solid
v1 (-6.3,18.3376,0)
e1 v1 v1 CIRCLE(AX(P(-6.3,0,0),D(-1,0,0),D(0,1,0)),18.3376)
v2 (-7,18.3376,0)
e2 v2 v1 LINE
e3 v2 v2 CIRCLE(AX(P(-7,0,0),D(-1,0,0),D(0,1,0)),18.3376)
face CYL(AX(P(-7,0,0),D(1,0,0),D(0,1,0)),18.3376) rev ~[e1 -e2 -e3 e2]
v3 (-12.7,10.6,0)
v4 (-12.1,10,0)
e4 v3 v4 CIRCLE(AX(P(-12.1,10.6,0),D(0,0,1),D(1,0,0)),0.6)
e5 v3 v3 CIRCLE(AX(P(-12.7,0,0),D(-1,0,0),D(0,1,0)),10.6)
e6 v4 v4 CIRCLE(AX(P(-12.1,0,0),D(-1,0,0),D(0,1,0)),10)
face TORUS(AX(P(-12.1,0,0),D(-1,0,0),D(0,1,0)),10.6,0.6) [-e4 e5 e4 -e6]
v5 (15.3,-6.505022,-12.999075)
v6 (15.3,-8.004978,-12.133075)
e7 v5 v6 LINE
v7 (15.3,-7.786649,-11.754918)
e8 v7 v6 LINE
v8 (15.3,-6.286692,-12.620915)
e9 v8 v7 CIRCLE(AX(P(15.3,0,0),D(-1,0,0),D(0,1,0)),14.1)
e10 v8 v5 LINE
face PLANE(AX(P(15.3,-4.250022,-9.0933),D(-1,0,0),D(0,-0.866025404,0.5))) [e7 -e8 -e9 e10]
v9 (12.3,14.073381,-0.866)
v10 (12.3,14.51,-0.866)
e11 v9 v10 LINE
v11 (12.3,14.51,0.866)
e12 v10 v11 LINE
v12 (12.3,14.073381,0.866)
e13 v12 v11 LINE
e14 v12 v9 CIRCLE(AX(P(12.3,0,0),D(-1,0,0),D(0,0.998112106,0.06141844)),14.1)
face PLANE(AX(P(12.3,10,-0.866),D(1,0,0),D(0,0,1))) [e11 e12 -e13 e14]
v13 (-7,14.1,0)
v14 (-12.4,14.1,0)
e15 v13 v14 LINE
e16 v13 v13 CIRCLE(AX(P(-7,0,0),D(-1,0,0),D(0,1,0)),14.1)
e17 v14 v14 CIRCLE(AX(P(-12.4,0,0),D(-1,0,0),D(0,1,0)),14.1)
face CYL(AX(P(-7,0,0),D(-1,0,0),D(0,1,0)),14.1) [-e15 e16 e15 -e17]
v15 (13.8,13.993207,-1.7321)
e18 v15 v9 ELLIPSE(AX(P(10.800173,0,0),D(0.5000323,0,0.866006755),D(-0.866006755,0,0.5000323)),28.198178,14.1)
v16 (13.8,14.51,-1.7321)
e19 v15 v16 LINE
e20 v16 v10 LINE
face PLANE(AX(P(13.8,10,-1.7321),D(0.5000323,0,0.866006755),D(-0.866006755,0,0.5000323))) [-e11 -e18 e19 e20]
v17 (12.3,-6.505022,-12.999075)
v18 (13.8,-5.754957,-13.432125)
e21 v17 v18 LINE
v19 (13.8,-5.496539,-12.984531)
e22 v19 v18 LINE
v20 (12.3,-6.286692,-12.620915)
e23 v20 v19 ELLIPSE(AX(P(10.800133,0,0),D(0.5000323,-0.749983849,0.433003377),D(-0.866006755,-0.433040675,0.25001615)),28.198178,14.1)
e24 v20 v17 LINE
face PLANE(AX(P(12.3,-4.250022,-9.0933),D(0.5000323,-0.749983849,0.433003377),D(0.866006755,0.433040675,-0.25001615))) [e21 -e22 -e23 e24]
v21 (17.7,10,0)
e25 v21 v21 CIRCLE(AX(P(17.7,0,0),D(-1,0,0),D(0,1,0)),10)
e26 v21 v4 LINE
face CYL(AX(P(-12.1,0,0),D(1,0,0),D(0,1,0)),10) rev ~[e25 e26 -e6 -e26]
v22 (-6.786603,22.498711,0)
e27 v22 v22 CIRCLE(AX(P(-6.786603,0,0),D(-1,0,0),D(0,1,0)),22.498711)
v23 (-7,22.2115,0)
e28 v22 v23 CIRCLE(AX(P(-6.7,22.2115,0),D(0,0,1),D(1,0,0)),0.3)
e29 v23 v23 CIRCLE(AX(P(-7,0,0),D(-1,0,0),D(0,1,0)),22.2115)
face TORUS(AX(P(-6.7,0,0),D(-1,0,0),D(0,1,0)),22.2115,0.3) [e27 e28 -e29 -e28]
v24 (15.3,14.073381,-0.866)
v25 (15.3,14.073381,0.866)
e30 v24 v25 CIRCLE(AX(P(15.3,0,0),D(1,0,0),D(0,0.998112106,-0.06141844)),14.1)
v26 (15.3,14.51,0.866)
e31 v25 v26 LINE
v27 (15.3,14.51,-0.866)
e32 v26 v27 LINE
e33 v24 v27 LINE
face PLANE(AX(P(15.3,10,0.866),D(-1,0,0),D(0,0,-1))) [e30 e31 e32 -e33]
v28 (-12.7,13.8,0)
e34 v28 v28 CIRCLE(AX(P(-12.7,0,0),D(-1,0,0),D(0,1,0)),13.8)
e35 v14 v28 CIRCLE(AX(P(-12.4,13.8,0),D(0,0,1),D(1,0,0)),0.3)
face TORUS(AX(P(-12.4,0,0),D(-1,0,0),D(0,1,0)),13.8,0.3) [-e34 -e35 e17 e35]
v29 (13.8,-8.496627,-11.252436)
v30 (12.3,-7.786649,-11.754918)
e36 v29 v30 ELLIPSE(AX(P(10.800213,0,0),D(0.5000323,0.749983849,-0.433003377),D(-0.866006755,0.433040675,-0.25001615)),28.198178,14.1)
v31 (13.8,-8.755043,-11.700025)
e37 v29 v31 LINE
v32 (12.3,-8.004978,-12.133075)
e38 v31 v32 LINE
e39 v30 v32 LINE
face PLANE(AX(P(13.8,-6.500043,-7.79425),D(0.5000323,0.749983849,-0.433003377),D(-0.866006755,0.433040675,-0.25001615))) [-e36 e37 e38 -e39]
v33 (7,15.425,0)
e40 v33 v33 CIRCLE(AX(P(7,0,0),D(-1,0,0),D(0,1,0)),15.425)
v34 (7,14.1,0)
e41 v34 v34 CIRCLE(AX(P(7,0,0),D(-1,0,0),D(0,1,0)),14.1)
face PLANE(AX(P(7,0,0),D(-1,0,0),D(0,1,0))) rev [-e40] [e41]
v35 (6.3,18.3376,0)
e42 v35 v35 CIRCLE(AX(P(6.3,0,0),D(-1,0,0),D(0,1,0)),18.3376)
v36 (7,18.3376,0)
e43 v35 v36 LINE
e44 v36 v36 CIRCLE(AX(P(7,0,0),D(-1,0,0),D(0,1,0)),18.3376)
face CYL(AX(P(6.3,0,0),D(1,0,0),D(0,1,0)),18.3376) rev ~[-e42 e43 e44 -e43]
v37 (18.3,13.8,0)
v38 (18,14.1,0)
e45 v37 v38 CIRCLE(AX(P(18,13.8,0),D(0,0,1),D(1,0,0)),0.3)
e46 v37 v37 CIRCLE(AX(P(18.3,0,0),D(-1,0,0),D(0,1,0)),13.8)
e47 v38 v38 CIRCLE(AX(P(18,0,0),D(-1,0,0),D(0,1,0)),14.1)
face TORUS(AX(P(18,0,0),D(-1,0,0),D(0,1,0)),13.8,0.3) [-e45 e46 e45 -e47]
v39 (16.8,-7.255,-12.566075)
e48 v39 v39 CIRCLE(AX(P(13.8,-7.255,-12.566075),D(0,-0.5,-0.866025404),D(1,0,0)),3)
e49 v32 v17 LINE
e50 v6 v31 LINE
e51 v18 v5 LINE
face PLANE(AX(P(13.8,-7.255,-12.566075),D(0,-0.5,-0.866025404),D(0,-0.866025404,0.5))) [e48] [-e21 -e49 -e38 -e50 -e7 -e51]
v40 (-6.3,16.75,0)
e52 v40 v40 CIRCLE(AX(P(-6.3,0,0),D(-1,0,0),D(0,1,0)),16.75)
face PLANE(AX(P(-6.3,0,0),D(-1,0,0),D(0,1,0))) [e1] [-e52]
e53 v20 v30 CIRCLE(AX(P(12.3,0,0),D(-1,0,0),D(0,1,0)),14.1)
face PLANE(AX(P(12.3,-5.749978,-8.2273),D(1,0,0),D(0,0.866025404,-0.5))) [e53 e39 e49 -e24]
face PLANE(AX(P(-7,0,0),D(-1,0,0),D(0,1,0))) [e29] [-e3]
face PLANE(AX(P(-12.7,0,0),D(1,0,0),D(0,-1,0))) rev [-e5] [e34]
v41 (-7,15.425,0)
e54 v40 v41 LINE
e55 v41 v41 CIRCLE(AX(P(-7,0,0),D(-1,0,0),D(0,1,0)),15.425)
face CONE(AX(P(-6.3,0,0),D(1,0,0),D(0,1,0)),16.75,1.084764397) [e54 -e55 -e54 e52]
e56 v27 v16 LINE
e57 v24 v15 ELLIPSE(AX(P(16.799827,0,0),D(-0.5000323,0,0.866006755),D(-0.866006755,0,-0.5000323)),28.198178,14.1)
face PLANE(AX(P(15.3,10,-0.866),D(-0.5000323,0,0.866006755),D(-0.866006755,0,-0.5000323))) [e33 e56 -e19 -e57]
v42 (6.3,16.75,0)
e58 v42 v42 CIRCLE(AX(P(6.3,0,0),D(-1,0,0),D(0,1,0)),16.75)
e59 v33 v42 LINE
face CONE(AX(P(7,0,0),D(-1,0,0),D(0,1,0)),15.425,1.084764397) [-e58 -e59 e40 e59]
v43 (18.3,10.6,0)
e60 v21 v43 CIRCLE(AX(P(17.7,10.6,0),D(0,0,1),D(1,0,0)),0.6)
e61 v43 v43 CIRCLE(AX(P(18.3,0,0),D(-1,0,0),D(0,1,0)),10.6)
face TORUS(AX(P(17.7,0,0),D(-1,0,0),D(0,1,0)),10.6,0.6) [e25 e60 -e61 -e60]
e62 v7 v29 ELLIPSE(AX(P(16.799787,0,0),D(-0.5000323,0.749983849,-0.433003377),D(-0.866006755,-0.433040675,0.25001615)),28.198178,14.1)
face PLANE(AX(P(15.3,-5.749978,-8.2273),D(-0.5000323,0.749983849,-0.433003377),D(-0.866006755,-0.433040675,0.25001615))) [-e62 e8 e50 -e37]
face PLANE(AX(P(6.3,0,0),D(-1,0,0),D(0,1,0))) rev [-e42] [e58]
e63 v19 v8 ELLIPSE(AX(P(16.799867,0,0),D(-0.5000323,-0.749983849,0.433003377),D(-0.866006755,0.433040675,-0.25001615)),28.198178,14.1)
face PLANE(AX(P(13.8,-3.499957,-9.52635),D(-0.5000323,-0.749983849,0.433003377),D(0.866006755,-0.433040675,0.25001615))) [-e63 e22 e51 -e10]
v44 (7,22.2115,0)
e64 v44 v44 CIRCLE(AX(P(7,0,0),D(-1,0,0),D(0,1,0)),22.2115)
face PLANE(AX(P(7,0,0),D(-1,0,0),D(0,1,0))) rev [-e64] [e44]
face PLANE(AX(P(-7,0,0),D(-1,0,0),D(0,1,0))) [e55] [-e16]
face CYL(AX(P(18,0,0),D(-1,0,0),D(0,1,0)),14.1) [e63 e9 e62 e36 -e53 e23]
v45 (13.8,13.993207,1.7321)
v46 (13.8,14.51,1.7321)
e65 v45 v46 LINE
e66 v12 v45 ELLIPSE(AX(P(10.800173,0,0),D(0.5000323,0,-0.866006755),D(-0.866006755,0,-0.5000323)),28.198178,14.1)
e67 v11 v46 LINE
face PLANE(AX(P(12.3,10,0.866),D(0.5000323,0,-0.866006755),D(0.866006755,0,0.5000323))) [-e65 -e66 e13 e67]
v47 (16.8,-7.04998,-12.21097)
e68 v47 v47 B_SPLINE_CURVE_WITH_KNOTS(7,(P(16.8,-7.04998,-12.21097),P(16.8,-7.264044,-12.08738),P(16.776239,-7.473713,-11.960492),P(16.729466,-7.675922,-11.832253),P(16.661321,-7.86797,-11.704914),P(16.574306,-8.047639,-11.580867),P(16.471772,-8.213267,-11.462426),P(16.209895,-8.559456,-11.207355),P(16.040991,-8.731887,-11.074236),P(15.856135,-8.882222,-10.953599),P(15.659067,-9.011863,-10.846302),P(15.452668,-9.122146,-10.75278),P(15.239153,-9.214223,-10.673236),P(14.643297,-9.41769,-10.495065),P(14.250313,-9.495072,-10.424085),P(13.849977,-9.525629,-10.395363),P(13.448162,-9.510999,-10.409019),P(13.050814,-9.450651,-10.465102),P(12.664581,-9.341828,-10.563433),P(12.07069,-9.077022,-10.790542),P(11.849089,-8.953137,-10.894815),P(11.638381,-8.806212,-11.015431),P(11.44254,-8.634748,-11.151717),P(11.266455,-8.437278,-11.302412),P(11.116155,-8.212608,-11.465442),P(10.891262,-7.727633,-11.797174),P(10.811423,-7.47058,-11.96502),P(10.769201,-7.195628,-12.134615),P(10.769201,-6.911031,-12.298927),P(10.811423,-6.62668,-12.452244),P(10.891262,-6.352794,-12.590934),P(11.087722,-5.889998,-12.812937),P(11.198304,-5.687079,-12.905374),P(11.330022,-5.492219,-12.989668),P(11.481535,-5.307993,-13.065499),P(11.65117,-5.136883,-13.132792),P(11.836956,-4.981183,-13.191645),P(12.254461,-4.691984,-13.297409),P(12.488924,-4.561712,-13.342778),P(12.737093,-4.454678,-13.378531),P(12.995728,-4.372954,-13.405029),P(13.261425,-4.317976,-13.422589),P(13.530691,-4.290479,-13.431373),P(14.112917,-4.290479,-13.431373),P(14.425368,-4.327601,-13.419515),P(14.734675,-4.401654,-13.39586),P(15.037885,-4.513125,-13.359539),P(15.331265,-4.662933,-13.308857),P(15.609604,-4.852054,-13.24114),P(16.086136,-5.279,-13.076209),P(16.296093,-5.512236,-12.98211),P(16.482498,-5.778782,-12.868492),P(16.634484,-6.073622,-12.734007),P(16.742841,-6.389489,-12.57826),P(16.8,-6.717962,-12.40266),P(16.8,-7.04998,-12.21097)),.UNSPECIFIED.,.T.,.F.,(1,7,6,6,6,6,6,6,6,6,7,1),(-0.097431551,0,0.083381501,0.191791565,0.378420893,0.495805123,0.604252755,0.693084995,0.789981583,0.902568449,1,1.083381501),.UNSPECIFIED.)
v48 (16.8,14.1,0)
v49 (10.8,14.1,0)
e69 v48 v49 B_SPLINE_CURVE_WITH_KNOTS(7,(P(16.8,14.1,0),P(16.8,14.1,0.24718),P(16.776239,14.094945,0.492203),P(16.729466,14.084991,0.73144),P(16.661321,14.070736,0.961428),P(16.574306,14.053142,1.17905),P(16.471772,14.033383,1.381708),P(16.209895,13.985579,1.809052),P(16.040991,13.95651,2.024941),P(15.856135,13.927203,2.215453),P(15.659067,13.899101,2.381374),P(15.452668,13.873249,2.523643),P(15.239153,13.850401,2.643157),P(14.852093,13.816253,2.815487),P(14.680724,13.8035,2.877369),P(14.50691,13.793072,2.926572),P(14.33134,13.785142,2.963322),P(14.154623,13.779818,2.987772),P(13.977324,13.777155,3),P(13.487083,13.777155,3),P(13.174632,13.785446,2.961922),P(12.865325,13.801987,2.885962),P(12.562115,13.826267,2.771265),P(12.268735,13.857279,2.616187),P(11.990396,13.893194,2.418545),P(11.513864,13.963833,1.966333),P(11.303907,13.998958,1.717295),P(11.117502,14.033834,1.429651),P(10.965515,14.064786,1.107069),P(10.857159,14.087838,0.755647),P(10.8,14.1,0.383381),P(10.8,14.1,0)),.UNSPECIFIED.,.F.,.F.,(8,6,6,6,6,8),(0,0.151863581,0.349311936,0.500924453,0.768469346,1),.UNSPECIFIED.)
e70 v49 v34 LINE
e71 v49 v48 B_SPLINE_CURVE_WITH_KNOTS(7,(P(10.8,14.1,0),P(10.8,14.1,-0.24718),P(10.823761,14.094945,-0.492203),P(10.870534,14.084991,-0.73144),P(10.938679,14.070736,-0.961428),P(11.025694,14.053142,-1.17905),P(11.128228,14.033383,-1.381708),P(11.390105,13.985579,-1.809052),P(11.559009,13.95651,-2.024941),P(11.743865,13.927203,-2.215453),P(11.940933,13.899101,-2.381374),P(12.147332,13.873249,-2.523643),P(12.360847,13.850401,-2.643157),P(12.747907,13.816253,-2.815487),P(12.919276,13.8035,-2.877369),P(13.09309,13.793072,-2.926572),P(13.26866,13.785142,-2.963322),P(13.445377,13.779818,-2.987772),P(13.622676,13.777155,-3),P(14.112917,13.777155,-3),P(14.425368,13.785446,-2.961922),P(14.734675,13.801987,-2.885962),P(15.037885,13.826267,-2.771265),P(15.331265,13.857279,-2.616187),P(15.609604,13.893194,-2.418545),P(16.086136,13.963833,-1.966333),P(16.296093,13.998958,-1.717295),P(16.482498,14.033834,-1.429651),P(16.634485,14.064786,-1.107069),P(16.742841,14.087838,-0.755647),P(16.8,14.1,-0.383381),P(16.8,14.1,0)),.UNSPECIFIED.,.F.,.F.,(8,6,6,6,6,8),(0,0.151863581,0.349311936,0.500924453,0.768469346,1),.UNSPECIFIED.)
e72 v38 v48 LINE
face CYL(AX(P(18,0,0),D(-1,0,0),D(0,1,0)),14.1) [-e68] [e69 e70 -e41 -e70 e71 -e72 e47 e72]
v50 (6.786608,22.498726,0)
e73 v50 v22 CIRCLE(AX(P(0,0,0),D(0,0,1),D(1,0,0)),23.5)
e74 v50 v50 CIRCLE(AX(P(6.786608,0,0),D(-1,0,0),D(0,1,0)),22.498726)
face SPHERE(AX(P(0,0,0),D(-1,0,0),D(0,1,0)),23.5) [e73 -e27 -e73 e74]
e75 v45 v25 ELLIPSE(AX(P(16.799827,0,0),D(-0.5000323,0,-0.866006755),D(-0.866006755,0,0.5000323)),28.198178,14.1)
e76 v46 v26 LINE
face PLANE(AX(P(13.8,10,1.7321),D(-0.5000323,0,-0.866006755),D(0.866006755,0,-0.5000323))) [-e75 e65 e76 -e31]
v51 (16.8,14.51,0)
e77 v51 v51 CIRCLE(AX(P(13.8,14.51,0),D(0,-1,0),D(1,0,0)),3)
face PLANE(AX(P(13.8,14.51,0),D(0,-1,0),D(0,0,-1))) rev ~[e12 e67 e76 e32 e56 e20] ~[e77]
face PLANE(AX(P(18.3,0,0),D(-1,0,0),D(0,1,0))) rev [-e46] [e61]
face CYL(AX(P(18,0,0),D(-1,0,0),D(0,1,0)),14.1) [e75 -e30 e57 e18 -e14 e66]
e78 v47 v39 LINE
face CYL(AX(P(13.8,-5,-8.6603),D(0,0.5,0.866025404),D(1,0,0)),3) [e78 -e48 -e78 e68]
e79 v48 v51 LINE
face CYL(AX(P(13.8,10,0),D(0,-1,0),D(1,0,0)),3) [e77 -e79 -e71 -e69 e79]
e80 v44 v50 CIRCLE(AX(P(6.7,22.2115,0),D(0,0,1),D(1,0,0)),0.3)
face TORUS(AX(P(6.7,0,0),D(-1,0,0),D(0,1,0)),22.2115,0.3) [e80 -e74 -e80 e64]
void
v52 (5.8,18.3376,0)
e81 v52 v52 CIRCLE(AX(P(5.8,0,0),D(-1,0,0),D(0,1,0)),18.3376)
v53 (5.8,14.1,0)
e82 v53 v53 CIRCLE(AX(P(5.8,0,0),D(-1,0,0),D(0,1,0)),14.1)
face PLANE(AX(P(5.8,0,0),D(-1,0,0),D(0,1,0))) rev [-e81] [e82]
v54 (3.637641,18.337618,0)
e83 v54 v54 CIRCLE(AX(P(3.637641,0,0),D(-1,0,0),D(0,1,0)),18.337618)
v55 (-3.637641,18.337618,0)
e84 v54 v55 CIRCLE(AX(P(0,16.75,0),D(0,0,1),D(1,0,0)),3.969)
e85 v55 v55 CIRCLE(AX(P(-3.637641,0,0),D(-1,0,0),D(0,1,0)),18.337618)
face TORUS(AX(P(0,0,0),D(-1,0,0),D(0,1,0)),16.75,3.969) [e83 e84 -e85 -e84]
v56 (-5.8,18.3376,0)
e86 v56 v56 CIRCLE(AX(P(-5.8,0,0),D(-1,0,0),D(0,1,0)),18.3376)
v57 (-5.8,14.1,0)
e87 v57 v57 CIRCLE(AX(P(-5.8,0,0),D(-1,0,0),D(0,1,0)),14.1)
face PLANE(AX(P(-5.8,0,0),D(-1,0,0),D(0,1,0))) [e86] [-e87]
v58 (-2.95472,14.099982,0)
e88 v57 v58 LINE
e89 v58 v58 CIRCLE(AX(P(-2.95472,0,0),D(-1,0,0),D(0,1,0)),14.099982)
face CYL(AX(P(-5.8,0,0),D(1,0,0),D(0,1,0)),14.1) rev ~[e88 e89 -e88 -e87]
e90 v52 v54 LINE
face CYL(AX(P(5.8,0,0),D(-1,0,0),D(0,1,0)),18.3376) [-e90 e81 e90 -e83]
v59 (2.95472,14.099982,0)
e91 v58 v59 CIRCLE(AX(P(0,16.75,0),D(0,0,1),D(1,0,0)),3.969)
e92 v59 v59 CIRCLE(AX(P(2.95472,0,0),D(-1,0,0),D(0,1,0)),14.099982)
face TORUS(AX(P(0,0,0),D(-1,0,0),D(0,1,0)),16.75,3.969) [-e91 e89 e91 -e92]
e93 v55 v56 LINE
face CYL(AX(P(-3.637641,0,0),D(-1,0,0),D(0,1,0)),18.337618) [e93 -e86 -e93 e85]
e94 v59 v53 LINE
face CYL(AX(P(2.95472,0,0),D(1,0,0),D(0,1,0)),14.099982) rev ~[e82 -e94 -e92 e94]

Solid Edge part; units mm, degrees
sketch "Sketch1" plane through (0, 10, 0) normal (0, -1, 0) x (1, 0, 0)
  circle A0 centre (13.8, 0) radius 3
  line L0 (12.3, -0.866) -> (12.3, 0.866)
  line L1 (12.3, 0.866) -> (13.8, 1.7321)
  line L2 (13.8, 1.7321) -> (15.3, 0.866)
  line L3 (15.3, 0.866) -> (15.3, -0.866)
  line L4 (15.3, -0.866) -> (13.8, -1.7321)
  line L5 (13.8, -1.7321) -> (12.3, -0.866)
extrude "ExtrudedProtrusion_1" add sketch "Sketch1" against normal blind 4.51
sketch "Sketch2" plane through (0, 0, 0) normal (0, 0, 1) x (1, 0, 0)
  arc A0 (-12.7, 10.6) -> (-12.1, 10) centre (-12.1, 10.6) ccw
  line L0 (-12.1, 10) -> (17.7, 10)
  arc A1 (17.7, 10) -> (18.3, 10.6) centre (17.7, 10.6) ccw
  line L1 (18.3, 10.6) -> (18.3, 13.8)
  arc A2 (18.3, 13.8) -> (18, 14.1) centre (18, 13.8) ccw
  line L2 (18, 14.1) -> (7, 14.1)
  line L3 (7, 14.1) -> (7, 15.425)
  line L4 (7, 15.425) -> (6.3, 16.75)
  line L5 (6.3, 16.75) -> (6.3, 18.3376)
  line L6 (6.3, 18.3376) -> (7, 18.3376)
  line L7 (7, 18.3376) -> (7, 22.2115)
  arc A3 (7, 22.2115) -> (6.7866, 22.4987) centre (6.7, 22.2115) ccw
  arc A4 (6.7866, 22.4987) -> (-6.7866, 22.4987) centre (0, 0) ccw
  arc A5 (-6.7866, 22.4987) -> (-7, 22.2115) centre (-6.7, 22.2115) ccw
  line L8 (-7, 22.2115) -> (-7, 18.3376)
  line L9 (-7, 18.3376) -> (-6.3, 18.3376)
  line L10 (-6.3, 18.3376) -> (-6.3, 16.75)
  line L11 (-6.3, 16.75) -> (-7, 15.425)
  line L12 (-7, 15.425) -> (-7, 14.1)
  line L13 (-7, 14.1) -> (-12.4, 14.1)
  arc A6 (-12.4, 14.1) -> (-12.7, 13.8) centre (-12.4, 13.8) ccw
  line L14 (-12.7, 13.8) -> (-12.7, 10.6)
  line L15 (-5.8, 14.1) -> (-2.9547, 14.1)
  arc A7 (-2.9547, 14.1) -> (2.9547, 14.1) centre (0, 16.75) ccw
  line L16 (2.9547, 14.1) -> (5.8, 14.1)
  line L17 (5.8, 14.1) -> (5.8, 18.3376)
  line L18 (5.8, 18.3376) -> (3.6376, 18.3376)
  arc A8 (3.6376, 18.3376) -> (-3.6376, 18.3376) centre (0, 16.75) ccw
  line L19 (-3.6376, 18.3376) -> (-5.8, 18.3376)
  line L20 (-5.8, 18.3376) -> (-5.8, 14.1)
revolve "RevolvedProtrusion1" add sketch "Sketch2" angle 360 about axis through (18.3, 0, 0) along (-1, 0, 0)
sketch "Sketch3" plane through (0, -5, -8.6603) normal (0, -0.5, -0.8660254) x (1, 0, 0)
  circle A0 centre (13.8, 0) radius 3
  line L0 (12.3, 0.866) -> (12.3, -0.866)
  line L1 (12.3, -0.866) -> (13.8, -1.7321)
  line L2 (13.8, -1.7321) -> (15.3, -0.866)
  line L3 (15.3, -0.866) -> (15.3, 0.866)
  line L4 (15.3, 0.866) -> (13.8, 1.7321)
  line L5 (13.8, 1.7321) -> (12.3, 0.866)
extrude "ExtrudedProtrusion_2" add sketch "Sketch3" along normal blind 4.51
